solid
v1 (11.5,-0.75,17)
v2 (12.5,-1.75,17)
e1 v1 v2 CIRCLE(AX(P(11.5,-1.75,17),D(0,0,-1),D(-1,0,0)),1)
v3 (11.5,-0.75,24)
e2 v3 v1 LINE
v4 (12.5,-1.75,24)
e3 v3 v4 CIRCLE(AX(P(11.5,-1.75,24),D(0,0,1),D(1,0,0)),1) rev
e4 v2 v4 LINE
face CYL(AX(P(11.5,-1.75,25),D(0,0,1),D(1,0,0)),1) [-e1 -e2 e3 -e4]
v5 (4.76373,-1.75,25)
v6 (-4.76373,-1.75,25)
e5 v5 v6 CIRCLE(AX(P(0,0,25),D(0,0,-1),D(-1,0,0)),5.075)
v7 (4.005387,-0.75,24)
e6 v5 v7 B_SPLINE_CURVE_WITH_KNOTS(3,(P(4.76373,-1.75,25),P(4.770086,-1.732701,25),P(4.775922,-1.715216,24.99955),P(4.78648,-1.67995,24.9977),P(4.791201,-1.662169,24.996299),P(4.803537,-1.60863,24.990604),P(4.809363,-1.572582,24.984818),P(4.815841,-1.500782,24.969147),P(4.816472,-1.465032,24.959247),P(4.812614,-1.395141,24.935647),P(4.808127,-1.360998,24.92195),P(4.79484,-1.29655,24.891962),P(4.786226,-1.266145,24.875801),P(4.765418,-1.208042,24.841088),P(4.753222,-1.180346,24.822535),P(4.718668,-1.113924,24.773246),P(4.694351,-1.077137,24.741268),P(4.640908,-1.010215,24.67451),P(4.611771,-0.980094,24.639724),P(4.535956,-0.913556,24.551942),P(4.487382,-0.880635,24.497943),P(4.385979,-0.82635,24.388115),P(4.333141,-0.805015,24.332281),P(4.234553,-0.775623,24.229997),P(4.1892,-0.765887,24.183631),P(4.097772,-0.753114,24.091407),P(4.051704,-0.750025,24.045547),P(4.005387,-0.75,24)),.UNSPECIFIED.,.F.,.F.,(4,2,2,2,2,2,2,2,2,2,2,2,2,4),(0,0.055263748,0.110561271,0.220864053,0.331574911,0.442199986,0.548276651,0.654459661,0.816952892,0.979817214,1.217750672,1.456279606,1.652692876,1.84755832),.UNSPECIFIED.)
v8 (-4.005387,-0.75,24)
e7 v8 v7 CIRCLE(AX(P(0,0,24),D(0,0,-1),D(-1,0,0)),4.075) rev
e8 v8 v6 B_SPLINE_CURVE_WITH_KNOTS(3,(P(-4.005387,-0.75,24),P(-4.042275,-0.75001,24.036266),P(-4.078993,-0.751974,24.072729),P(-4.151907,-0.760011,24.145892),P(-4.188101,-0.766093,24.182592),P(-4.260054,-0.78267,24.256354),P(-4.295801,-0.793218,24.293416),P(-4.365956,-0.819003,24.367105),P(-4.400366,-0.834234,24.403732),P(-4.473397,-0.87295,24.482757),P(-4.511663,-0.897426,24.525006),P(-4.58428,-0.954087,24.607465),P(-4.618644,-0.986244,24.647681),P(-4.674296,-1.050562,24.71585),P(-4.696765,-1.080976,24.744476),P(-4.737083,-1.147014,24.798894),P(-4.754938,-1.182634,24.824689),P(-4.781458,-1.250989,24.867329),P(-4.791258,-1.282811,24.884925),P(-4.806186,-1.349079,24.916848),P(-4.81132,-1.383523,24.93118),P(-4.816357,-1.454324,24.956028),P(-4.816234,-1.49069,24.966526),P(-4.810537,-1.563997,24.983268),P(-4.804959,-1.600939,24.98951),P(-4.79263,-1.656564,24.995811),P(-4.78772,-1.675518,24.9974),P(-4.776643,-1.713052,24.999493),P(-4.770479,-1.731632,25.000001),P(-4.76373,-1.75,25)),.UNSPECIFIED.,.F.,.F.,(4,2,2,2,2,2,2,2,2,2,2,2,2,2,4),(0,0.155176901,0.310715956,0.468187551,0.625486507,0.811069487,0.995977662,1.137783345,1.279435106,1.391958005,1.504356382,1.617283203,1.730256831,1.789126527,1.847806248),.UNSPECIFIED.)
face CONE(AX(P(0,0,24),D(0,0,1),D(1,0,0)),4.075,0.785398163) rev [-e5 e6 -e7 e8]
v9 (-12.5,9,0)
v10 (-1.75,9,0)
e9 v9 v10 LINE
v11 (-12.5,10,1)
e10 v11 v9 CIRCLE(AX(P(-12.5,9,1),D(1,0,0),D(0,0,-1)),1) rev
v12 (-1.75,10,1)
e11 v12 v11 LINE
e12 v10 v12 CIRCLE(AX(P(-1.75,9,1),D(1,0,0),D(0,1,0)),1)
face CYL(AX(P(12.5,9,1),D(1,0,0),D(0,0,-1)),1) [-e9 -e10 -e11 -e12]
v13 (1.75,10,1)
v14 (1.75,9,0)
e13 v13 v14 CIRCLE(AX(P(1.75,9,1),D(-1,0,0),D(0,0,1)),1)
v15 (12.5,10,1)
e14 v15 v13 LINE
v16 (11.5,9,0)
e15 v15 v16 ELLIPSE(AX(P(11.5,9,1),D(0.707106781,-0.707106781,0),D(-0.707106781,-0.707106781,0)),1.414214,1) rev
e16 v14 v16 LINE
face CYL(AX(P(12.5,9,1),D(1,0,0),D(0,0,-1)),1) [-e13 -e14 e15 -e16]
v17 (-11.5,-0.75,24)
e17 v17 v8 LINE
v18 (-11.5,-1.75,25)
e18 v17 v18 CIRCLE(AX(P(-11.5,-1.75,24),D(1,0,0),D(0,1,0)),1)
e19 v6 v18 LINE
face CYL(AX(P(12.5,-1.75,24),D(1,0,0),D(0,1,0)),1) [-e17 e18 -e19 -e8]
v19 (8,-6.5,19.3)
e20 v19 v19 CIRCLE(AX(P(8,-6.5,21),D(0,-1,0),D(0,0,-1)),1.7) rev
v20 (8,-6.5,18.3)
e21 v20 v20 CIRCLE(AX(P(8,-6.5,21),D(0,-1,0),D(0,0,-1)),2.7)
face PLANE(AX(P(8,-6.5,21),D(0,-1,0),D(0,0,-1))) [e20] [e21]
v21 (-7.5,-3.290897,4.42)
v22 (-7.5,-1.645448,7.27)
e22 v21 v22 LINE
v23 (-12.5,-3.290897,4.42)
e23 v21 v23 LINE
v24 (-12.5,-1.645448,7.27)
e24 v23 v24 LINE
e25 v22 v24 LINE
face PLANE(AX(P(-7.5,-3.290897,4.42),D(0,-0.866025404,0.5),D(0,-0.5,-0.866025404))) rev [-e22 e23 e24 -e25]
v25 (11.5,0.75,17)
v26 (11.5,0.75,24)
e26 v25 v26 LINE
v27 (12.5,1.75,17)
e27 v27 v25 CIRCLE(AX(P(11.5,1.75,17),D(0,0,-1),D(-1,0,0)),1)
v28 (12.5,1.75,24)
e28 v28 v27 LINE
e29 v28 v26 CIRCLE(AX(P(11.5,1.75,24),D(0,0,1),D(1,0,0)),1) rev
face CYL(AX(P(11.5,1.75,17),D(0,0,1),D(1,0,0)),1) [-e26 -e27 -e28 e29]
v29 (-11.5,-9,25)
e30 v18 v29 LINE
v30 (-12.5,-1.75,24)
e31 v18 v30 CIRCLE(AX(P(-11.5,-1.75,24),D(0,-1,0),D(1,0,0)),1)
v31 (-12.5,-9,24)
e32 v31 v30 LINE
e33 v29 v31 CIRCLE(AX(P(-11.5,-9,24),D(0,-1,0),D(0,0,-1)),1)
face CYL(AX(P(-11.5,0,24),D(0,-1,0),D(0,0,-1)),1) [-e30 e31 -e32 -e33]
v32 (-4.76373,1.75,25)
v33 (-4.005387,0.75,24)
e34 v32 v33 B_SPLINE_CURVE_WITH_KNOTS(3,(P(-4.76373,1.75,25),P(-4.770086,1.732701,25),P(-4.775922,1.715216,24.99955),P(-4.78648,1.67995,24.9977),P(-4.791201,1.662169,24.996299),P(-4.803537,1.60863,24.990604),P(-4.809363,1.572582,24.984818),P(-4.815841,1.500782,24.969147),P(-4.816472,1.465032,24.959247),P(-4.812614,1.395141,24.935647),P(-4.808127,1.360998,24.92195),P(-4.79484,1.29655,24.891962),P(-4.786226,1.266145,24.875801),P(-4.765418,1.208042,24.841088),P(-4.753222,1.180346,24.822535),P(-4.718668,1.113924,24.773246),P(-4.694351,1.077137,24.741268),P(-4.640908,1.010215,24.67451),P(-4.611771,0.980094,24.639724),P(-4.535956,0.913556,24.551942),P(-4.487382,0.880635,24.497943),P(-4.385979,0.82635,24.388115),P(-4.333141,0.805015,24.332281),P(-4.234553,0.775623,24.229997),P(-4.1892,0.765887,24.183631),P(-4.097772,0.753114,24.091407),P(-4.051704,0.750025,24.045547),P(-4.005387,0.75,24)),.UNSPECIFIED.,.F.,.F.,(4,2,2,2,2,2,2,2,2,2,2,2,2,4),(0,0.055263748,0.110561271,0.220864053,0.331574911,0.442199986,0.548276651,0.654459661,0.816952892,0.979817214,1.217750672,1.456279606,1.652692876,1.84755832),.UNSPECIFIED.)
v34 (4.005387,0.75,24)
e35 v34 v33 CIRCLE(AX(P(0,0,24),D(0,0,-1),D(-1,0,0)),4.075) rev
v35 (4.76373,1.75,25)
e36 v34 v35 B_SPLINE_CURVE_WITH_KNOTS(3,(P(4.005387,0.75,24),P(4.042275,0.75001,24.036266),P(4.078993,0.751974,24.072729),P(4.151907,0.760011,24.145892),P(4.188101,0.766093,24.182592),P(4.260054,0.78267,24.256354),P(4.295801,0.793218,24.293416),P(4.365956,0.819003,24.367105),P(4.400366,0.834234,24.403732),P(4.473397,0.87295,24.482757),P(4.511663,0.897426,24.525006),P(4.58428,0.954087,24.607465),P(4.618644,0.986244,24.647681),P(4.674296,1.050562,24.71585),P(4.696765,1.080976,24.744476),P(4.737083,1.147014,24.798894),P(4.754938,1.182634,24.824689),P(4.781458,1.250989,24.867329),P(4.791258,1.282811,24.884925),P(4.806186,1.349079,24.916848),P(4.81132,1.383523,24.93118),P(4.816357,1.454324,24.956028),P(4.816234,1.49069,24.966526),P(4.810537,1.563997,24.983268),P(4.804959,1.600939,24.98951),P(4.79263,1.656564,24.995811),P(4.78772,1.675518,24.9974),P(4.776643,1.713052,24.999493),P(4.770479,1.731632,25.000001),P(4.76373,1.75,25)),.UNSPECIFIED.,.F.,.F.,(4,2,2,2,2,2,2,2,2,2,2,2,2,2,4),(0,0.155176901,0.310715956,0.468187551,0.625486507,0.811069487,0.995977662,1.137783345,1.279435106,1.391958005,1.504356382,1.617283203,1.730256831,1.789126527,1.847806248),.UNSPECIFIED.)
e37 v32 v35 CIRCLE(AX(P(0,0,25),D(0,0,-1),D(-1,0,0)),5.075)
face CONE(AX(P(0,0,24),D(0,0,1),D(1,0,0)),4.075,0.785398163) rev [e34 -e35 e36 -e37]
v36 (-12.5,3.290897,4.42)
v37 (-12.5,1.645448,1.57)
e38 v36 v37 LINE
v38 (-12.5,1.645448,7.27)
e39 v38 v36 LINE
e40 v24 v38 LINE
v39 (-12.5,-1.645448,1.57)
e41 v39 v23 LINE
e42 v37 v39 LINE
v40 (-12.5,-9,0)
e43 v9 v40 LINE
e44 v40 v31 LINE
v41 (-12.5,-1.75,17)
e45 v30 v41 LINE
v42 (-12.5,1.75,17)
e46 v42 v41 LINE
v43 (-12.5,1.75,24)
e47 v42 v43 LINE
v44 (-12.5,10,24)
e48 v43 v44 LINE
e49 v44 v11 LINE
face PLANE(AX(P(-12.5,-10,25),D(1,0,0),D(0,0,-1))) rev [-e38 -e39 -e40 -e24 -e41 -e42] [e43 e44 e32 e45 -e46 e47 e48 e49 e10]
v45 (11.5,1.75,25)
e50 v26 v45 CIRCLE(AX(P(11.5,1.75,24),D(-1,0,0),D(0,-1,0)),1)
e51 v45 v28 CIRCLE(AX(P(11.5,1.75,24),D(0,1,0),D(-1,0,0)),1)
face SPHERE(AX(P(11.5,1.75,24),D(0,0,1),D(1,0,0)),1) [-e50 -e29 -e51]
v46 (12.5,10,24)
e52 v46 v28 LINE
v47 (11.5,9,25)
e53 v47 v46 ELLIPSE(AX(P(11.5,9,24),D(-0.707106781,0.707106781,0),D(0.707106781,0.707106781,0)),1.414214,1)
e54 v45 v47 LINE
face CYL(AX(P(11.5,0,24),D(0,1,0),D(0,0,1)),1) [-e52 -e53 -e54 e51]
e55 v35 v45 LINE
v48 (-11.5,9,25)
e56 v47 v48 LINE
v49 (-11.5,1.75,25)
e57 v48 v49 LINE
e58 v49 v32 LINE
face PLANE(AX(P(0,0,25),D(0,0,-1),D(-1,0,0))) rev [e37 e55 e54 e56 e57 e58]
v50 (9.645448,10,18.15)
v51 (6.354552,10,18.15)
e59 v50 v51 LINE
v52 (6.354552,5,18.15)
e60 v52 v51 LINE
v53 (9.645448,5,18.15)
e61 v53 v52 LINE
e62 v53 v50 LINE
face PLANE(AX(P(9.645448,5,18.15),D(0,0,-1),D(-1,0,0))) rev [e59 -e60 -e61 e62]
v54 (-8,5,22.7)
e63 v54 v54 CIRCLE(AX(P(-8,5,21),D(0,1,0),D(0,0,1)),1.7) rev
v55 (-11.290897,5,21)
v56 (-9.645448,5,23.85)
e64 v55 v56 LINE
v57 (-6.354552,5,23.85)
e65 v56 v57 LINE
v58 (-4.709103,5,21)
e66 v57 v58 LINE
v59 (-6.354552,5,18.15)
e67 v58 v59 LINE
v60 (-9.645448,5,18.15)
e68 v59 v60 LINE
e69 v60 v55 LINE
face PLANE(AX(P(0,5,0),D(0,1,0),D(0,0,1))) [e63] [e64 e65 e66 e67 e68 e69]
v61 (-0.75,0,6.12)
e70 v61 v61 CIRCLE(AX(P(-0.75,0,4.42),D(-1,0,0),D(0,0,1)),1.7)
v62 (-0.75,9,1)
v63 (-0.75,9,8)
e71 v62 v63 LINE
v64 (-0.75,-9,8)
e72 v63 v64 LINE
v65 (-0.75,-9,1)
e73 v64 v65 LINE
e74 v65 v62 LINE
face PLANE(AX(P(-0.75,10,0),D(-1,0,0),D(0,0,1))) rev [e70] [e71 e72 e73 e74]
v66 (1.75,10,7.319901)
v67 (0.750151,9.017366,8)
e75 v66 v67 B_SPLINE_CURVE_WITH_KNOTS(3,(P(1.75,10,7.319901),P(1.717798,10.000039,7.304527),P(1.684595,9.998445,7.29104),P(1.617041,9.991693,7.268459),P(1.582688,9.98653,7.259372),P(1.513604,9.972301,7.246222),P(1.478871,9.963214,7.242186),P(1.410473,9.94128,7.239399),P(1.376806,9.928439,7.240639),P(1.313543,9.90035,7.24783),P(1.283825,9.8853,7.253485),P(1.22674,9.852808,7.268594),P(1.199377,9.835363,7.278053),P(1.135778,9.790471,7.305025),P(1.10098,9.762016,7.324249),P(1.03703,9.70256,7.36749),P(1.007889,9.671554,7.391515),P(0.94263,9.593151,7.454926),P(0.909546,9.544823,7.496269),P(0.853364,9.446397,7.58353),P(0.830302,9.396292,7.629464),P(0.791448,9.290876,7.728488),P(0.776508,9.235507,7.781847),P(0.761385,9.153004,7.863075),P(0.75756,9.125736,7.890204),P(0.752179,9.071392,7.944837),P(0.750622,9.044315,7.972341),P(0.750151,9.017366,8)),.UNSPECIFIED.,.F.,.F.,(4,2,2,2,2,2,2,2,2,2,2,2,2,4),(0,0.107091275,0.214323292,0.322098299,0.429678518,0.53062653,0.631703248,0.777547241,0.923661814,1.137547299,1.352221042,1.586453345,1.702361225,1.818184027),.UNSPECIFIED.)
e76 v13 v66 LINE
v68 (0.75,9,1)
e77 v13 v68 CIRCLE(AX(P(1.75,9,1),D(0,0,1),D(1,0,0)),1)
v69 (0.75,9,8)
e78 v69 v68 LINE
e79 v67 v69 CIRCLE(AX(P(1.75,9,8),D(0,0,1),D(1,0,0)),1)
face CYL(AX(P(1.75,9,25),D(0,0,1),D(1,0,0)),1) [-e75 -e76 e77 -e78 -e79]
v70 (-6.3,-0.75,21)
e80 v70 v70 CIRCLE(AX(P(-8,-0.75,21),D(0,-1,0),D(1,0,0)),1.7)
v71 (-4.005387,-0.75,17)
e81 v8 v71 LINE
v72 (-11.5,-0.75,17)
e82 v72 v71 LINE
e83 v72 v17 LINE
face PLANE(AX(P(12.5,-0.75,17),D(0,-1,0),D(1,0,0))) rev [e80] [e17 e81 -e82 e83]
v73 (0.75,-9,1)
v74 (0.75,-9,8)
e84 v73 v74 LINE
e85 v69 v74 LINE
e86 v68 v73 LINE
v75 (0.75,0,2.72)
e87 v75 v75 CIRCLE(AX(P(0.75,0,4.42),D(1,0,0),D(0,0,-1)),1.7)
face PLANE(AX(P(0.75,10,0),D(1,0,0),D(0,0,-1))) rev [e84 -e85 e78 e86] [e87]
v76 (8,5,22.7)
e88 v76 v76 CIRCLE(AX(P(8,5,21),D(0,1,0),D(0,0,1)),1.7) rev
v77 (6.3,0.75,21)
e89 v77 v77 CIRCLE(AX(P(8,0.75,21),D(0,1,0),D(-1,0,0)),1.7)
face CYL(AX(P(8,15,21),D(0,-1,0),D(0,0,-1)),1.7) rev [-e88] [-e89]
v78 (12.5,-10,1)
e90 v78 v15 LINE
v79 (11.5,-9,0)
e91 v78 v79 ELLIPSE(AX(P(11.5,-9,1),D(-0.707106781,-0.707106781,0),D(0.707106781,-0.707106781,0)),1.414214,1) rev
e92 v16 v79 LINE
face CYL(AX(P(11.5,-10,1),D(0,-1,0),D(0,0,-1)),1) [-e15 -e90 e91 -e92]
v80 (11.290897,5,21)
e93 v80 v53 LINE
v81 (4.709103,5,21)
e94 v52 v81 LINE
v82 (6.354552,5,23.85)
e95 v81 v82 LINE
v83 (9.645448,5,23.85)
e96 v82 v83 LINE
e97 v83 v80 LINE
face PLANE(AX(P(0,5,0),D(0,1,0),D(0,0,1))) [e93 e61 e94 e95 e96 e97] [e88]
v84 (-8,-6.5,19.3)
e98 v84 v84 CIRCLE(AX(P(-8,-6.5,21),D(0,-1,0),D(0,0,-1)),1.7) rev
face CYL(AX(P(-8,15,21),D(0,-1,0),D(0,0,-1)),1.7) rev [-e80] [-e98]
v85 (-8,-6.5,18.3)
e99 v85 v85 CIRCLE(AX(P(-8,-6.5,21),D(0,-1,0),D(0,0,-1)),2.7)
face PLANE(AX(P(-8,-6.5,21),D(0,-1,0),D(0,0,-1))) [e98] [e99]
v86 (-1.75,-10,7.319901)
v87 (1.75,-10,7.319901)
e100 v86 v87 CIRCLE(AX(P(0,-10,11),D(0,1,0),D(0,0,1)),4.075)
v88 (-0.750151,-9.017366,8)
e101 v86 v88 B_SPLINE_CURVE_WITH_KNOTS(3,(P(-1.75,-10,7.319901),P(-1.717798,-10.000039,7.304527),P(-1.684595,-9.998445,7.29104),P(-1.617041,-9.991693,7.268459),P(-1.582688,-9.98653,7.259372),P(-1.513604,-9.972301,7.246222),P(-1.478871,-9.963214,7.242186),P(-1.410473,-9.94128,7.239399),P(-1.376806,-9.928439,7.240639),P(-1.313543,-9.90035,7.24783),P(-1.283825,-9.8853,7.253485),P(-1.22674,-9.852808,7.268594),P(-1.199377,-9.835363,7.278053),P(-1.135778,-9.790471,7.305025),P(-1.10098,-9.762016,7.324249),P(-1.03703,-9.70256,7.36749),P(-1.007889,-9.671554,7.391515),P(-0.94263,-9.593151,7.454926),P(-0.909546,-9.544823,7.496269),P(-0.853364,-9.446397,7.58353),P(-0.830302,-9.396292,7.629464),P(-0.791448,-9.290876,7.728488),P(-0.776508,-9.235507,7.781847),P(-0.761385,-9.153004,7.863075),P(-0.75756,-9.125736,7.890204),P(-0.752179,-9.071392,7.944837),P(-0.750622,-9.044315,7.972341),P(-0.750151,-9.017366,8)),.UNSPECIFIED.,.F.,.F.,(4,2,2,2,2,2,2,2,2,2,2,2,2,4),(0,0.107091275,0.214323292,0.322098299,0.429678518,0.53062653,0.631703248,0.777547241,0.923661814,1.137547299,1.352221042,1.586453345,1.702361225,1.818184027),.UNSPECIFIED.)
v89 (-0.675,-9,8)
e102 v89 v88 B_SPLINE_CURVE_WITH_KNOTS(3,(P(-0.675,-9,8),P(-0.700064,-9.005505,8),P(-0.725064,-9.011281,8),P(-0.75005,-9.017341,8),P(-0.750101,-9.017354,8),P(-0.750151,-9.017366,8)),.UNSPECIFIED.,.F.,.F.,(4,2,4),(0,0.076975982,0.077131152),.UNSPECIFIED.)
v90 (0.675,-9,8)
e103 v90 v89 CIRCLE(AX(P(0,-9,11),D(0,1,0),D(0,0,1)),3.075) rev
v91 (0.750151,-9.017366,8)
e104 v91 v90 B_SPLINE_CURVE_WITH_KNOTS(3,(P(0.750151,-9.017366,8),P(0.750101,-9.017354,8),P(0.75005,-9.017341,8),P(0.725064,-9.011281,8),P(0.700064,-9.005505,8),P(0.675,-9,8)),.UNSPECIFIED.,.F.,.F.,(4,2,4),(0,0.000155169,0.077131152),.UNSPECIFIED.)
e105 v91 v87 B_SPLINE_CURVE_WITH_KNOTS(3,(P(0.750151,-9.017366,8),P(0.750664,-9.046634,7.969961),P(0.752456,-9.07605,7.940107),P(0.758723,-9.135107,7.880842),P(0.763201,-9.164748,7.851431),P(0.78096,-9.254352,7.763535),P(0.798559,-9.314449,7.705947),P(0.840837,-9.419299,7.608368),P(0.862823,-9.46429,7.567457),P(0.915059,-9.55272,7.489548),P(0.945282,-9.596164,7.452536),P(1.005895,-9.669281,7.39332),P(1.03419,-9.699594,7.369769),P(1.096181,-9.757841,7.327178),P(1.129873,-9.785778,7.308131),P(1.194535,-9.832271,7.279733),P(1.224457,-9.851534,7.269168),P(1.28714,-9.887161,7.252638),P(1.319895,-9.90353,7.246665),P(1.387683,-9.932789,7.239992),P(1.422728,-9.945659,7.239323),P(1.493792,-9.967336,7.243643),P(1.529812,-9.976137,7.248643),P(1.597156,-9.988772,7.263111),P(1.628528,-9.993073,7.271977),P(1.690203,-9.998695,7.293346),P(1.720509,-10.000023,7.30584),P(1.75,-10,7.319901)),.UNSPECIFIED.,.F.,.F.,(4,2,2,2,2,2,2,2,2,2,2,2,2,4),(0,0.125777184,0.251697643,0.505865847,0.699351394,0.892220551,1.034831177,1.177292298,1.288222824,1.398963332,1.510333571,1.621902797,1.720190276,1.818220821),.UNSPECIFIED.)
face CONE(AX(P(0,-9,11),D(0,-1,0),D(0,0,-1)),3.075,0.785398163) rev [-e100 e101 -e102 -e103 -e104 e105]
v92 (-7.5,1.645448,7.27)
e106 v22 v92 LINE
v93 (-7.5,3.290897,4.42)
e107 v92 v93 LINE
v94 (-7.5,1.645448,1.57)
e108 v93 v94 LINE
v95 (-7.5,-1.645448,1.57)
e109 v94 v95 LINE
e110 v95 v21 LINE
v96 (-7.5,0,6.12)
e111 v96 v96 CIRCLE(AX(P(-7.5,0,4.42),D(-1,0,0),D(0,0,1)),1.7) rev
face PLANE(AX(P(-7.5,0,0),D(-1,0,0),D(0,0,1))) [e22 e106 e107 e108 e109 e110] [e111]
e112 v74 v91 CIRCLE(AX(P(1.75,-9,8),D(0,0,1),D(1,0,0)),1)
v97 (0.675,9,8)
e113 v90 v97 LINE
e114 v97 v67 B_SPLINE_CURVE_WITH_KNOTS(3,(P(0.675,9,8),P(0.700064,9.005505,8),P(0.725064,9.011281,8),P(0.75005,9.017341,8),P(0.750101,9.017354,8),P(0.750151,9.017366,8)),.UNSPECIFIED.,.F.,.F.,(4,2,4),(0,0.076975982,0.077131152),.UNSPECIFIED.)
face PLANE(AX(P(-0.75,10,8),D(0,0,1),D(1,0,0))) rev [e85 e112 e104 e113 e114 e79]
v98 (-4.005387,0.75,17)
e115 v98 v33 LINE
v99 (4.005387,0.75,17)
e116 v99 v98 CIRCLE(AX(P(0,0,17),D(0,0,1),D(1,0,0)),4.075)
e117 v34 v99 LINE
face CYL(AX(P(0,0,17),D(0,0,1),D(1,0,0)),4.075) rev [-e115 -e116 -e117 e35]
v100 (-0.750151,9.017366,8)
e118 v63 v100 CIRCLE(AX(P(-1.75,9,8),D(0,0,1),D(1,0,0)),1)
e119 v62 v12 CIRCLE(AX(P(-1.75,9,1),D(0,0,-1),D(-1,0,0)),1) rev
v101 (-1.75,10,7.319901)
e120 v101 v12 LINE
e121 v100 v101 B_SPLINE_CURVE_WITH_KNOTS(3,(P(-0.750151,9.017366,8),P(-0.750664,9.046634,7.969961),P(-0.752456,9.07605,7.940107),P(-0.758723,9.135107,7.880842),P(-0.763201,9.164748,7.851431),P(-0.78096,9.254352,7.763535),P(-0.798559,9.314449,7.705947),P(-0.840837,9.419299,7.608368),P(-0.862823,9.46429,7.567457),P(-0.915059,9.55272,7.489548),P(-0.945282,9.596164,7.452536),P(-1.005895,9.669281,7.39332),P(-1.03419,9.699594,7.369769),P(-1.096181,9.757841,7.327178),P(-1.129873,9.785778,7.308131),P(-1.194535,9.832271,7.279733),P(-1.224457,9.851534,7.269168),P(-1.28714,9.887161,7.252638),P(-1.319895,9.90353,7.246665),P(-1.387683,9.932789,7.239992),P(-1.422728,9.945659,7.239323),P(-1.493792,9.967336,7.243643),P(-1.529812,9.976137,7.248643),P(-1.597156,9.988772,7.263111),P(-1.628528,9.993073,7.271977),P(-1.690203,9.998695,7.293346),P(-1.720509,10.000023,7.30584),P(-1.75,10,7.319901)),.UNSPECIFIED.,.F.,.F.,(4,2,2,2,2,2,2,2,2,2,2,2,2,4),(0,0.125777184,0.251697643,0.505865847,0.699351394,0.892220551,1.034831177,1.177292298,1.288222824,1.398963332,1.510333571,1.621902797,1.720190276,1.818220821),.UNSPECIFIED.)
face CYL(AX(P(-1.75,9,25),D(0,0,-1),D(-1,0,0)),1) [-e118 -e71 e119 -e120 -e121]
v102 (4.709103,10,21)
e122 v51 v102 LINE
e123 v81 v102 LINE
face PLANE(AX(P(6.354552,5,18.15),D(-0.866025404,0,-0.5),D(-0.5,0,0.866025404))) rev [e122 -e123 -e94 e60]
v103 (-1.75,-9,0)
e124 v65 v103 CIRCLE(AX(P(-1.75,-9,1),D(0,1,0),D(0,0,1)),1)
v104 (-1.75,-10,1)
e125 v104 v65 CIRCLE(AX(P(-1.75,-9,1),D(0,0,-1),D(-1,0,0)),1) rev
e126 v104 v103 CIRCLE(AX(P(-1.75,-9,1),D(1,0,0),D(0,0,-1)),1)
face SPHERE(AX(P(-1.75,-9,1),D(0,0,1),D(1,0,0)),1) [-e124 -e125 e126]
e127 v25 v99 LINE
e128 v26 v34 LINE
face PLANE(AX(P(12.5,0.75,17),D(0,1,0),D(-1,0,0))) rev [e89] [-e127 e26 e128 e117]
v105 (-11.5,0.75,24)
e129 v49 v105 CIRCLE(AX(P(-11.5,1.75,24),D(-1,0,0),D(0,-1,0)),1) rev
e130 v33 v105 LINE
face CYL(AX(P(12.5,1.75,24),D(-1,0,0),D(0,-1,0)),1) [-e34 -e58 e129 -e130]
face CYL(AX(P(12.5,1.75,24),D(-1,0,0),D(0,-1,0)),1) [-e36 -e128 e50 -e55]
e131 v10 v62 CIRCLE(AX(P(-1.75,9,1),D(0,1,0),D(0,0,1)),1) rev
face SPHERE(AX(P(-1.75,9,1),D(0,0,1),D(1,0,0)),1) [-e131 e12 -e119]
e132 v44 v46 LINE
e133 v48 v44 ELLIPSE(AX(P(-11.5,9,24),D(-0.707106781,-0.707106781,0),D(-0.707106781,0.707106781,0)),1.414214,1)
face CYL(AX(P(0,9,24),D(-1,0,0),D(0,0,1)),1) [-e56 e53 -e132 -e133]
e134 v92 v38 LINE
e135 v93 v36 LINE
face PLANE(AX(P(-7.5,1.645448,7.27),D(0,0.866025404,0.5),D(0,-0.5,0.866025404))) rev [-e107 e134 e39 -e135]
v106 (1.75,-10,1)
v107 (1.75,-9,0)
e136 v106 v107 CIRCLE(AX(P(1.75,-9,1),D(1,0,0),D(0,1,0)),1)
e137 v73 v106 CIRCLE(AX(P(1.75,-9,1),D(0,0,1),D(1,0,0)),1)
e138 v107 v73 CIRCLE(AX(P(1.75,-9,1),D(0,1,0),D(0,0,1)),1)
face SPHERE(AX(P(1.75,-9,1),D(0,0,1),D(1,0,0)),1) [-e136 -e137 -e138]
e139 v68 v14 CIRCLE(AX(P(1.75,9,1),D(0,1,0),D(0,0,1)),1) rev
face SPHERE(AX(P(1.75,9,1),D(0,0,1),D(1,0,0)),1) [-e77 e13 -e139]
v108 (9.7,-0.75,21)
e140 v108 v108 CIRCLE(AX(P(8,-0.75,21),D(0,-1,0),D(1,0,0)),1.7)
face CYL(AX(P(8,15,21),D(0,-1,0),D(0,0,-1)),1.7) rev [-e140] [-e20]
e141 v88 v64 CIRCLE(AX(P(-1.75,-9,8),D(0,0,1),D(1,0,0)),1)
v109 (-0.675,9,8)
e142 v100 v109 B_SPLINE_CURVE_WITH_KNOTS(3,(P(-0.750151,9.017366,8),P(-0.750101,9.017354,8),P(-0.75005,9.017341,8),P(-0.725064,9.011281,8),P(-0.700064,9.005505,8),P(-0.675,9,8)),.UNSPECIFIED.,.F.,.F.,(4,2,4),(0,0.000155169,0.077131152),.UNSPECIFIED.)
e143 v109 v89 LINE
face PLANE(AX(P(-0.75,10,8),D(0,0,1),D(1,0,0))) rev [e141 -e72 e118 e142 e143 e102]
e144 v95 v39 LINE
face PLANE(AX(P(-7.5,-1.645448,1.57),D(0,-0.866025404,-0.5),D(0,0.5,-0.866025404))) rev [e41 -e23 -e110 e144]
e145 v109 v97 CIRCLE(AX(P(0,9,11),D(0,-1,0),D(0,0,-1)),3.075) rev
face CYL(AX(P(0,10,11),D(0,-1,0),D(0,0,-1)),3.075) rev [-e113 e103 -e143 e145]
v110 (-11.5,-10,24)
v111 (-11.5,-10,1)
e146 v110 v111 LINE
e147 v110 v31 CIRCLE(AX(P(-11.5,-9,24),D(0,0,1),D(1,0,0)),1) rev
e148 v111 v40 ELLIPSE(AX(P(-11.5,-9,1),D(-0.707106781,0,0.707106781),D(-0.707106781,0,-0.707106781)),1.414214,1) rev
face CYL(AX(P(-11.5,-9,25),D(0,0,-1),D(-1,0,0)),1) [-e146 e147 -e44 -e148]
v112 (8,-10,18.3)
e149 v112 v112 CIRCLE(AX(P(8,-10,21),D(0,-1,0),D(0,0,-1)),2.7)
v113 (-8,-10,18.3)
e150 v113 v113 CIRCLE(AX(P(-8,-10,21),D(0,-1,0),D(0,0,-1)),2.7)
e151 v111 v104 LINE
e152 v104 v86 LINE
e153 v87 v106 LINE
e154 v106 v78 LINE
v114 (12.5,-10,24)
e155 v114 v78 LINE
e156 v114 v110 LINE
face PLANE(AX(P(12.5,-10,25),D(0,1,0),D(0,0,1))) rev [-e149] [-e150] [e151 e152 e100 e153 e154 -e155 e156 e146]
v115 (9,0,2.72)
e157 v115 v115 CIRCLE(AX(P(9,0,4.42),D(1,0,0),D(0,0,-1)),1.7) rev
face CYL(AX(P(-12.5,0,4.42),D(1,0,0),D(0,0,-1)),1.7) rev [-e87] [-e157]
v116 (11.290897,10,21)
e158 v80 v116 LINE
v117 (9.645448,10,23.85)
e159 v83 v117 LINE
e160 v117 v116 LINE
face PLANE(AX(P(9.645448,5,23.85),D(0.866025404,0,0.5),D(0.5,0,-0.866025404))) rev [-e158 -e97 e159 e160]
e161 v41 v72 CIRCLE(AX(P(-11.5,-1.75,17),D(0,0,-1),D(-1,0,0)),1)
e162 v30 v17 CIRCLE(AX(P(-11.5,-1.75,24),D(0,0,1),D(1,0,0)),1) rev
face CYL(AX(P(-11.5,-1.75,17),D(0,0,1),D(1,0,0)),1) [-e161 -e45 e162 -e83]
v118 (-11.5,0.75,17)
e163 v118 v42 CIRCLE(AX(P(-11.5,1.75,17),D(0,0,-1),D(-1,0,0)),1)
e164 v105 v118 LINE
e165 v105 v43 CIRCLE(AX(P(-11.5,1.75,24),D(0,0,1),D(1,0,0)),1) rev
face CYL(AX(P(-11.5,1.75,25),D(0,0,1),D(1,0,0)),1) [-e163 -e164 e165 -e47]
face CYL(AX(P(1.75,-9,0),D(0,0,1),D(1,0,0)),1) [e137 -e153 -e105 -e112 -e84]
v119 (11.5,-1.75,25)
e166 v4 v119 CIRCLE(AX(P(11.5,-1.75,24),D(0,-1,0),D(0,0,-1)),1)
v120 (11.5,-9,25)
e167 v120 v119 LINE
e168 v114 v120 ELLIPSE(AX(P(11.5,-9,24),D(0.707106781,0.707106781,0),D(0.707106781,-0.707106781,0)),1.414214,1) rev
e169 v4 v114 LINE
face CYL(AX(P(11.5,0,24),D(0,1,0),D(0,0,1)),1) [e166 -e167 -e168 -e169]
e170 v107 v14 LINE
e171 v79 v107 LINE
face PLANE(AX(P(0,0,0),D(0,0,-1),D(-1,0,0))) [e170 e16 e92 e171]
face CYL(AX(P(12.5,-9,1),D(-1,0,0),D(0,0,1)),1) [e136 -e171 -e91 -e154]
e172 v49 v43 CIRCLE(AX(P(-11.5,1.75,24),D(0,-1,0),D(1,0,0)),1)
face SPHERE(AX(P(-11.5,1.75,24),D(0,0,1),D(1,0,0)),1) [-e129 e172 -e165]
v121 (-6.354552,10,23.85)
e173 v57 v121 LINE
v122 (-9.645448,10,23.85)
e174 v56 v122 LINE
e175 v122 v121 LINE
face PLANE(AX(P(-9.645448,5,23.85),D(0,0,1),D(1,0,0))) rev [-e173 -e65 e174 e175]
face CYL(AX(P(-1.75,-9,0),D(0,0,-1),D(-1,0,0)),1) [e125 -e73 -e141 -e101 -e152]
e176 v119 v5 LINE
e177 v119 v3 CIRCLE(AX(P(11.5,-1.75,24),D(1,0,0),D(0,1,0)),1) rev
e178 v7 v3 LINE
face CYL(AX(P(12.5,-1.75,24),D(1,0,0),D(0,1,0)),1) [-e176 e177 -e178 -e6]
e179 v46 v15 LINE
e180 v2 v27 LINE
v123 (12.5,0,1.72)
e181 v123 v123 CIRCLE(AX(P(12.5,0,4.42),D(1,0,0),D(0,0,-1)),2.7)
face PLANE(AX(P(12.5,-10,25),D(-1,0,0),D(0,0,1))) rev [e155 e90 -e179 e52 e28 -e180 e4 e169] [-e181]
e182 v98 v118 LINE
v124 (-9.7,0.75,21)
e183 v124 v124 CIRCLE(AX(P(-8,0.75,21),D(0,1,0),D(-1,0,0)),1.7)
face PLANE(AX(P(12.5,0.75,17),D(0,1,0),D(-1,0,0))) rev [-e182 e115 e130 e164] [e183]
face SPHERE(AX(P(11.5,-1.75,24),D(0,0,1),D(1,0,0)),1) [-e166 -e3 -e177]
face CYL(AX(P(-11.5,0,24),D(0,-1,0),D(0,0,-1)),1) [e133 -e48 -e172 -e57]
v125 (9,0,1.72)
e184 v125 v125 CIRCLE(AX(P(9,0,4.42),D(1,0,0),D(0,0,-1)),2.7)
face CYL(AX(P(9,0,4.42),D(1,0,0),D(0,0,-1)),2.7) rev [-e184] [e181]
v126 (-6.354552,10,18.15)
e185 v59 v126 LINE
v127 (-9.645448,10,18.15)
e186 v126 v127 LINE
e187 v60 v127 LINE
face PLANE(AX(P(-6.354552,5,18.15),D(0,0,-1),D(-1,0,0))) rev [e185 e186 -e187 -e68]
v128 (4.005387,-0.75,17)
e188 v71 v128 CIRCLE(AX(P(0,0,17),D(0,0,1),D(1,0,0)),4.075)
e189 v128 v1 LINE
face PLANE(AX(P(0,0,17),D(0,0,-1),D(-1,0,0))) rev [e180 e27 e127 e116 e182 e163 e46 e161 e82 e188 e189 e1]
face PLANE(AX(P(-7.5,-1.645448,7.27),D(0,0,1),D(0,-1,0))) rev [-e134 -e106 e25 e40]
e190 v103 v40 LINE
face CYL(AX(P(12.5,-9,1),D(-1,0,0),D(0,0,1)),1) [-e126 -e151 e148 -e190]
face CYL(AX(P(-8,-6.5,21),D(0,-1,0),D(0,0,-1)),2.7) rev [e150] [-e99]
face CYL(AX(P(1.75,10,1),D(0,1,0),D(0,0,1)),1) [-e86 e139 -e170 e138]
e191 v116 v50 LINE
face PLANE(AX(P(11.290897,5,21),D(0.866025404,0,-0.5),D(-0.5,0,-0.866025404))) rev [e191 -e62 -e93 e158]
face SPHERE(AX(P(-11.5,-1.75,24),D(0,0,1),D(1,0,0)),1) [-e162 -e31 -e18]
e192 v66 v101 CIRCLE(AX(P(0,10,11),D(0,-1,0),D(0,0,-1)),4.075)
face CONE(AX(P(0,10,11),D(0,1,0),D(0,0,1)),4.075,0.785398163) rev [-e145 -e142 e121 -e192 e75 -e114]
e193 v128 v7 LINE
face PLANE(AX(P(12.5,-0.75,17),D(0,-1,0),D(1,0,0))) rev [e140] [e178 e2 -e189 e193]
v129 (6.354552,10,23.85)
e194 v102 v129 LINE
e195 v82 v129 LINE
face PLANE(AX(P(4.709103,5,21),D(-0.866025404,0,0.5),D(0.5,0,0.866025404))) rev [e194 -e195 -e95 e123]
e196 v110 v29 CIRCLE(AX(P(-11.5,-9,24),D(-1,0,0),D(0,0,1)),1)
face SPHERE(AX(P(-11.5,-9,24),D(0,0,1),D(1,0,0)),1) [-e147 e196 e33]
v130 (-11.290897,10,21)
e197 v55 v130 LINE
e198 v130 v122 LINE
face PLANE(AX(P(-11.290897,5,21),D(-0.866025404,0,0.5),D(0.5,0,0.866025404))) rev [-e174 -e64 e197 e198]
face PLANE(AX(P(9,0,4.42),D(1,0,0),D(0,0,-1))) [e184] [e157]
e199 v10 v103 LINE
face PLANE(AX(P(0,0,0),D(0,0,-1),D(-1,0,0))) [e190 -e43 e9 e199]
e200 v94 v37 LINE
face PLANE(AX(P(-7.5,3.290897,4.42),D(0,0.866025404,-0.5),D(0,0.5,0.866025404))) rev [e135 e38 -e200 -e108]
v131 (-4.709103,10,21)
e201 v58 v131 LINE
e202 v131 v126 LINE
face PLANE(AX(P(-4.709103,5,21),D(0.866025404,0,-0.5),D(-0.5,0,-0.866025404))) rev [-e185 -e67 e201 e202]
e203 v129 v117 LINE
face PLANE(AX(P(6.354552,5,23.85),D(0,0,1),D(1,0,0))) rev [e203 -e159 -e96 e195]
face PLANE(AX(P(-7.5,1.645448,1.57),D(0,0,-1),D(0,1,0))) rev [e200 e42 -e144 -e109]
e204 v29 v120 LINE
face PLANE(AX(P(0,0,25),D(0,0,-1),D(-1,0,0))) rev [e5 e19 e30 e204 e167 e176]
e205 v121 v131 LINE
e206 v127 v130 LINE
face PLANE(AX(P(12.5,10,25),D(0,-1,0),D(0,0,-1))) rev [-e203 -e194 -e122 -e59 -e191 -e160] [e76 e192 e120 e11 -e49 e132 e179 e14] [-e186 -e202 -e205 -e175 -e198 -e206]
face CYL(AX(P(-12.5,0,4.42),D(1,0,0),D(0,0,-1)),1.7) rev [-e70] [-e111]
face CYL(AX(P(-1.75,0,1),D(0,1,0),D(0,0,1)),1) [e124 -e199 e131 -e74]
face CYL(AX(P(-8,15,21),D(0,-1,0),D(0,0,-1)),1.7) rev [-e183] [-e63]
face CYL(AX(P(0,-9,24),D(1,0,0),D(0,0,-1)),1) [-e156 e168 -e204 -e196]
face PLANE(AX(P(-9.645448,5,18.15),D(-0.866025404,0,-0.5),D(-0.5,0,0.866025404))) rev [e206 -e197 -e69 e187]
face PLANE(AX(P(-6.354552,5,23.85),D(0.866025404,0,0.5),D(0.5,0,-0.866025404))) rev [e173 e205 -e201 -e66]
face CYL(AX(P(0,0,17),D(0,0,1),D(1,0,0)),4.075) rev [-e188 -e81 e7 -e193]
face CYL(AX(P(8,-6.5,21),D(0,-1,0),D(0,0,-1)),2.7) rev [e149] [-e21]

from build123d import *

# Parameters (mm, degrees)
SKIZZE1_W                        = 20
SKIZZE1_H                        = 25
AUFSATZ_LINEAR_AUSTRAGEN1_DEPTH  = 25
SKIZZE2_W                        = 1.5
SKIZZE2_H                        = 8
SCHNITT_PENDEL_DEPTH             = 20
SKIZZE3_R                        = 3.075
LOCH_PENDEL_DEPTH                = 20
SKIZZE6_W                        = 25
SKIZZE6_H                        = 1.5
SCHNITT_WELLE_DEPTH              = 8
SKIZZE7_R                        = 4.075
LOCH_WELLE_DEPTH                 = 8
SKIZZE9_R                        = 1.7
SCHNITT_LINEAR_AUSTRAGEN9_DEPTH  = 25
SKIZZE10_R                       = 2.7
SCHNITT_LINEAR_AUSTRAGEN10_DEPTH = 3.5
SCHNITT_LINEAR_AUSTRAGEN11_DEPTH = 5
SKIZZE13_R                       = 1.7
SCHNITT_LINEAR_AUSTRAGEN12_DEPTH = 25
SKIZZE15_R                       = 2.7
SCHNITT_LINEAR_AUSTRAGEN13_DEPTH = 3.5
SCHNITT_LINEAR_AUSTRAGEN14_DEPTH = 5
FASE1_SIZE                       = 1
VERRUNDUNG5_R                    = 1
VERRUNDUNG6_R                    = 1


with BuildPart() as part:
    # Skizze1 → Aufsatz-Linear austragen1 (new body)
    with BuildSketch(Plane(origin=(0, 0, 0), x_dir=(0, 1, 0), z_dir=(0, 0, 1))):
        Rectangle(SKIZZE1_W, SKIZZE1_H)
    extrude(amount=AUFSATZ_LINEAR_AUSTRAGEN1_DEPTH)

    # Skizze2 → Schnitt Pendel (cut)
    with BuildSketch(Plane.XZ.offset(10)):
        with Locations((0, 4)):
            Rectangle(SKIZZE2_W, SKIZZE2_H)
    extrude(amount=-SCHNITT_PENDEL_DEPTH, mode=Mode.SUBTRACT)

    # Skizze3 → Loch Pendel (cut)
    with BuildSketch(Plane.XZ.offset(10)):
        with Locations((0, 11)):
            Circle(SKIZZE3_R)
    extrude(amount=-LOCH_PENDEL_DEPTH, mode=Mode.SUBTRACT)

    # Skizze6 → Schnitt Welle (cut)
    with BuildSketch(Plane.XY.offset(25)):
        Rectangle(SKIZZE6_W, SKIZZE6_H)
    extrude(amount=-SCHNITT_WELLE_DEPTH, mode=Mode.SUBTRACT)

    # Skizze7 → Loch Welle (cut)
    with BuildSketch(Plane.XY.offset(25)):
        Circle(SKIZZE7_R)
    extrude(amount=-LOCH_WELLE_DEPTH, mode=Mode.SUBTRACT)

    # Skizze9 → Schnitt-Linear austragen9 (cut)
    with BuildSketch(Plane.YZ.offset(12.5)):
        with Locations(Location((0, 4.42, 0), (0, 0, 270))):
            Circle(SKIZZE9_R)
    extrude(amount=-SCHNITT_LINEAR_AUSTRAGEN9_DEPTH, mode=Mode.SUBTRACT)

    # Skizze10 → Schnitt-Linear austragen10 (cut)
    with BuildSketch(Plane.YZ.offset(12.5)):
        with Locations(Location((0, 4.42, 0), (0, 0, 270))):
            Circle(SKIZZE10_R)
    extrude(amount=-SCHNITT_LINEAR_AUSTRAGEN10_DEPTH, mode=Mode.SUBTRACT)

    # Skizze11 → Schnitt-Linear austragen11 (cut)
    with BuildSketch(Plane(origin=(-12.5, 0, 0), x_dir=(0, -1, 0), z_dir=(-1, 0, 0))):
        Polygon((3.290896534, 4.42), (1.645448267, 7.27), (-1.645448267, 7.27), (-3.290896534, 4.42), (-1.645448267, 1.57), (1.645448267, 1.57), align=None)
    extrude(amount=-SCHNITT_LINEAR_AUSTRAGEN11_DEPTH, mode=Mode.SUBTRACT)

    # Skizze13 → Schnitt-Linear austragen12 (cut)
    with BuildSketch(Plane.XZ.offset(10)):
        with Locations(Location((-8, 21, 0), (0, 0, 270))):
            Circle(SKIZZE13_R)
        with Locations(Location((8, 21, 0), (0, 0, 270))):
            Circle(SKIZZE13_R)
    extrude(amount=-SCHNITT_LINEAR_AUSTRAGEN12_DEPTH, mode=Mode.SUBTRACT)

    # Skizze15 → Schnitt-Linear austragen13 (cut)
    with BuildSketch(Plane.XZ.offset(10)):
        with Locations(Location((-8, 21, 0), (0, 0, 270))):
            Circle(SKIZZE15_R)
        with Locations(Location((8, 21, 0), (0, 0, 270))):
            Circle(SKIZZE15_R)
    extrude(amount=-SCHNITT_LINEAR_AUSTRAGEN13_DEPTH, mode=Mode.SUBTRACT)

    # Skizze16 → Schnitt-Linear austragen14 (cut)
    with BuildSketch(Plane(origin=(0, 10, 0), x_dir=(-1, 0, 0), z_dir=(0, 1, 0))):
        Polygon((11.290896534, 21), (9.645448267, 23.85), (6.354551733, 23.85), (4.709103466, 21), (6.354551733, 18.15), (9.645448267, 18.15), align=None)
        Polygon((-4.709103466, 21), (-6.354551733, 23.85), (-9.645448267, 23.85), (-11.290896534, 21), (-9.645448267, 18.15), (-6.354551733, 18.15), align=None)
    extrude(amount=-SCHNITT_LINEAR_AUSTRAGEN14_DEPTH, mode=Mode.SUBTRACT)

    # Fase1
    fase1_edges = [part.edges().sort_by_distance(p)[0] for p in [
        (0, -10, 14.075),
        (0, 4.075, 25),
        (0, -4.075, 25),
        (0, 10, 14.075),
    ]]
    chamfer(fase1_edges, length=FASE1_SIZE)

    # Verrundung5
    # the kernel refuses this fillet: 1 mm, written as the material it takes off along each edge
    with BuildSketch(Plane(origin=(12.5, 0.75, 27.5), x_dir=(0, 1, 0), z_dir=(0, 0, -1)), Plane(origin=(-12.5, -0.75, 27.5), x_dir=(0, -1, 0), z_dir=(0, 0, -1))) as verrundung5_piece_1:
        with BuildLine():
            CenterArc((VERRUNDUNG5_R, -VERRUNDUNG5_R), VERRUNDUNG5_R, 90, 90)
            Line((0, -VERRUNDUNG5_R), (0, 0))
            Line((0, 0), (VERRUNDUNG5_R, 0))
        make_face()
    extrude(amount=10.5, mode=Mode.SUBTRACT)
    with BuildSketch(Plane(origin=(12.5, -0.75, 27.5), x_dir=(0, -1, 0), z_dir=(0, 0, -1)), Plane(origin=(-12.5, 0.75, 27.5), x_dir=(0, 1, 0), z_dir=(0, 0, -1))) as verrundung5_piece_2:
        with BuildLine():
            CenterArc((VERRUNDUNG5_R, VERRUNDUNG5_R), VERRUNDUNG5_R, 180, 90)
            Line((0, VERRUNDUNG5_R), (0, 0))
            Line((0, 0), (VERRUNDUNG5_R, 0))
        make_face()
    extrude(amount=10.5, mode=Mode.SUBTRACT)
    with BuildSketch(Plane(origin=(-0.75, 10, 9.494613002), x_dir=(0, -1, 0), z_dir=(0, 0, -1))) as verrundung5_piece_3_section:
        with BuildLine():
            CenterArc((VERRUNDUNG5_R, VERRUNDUNG5_R), VERRUNDUNG5_R, 180, 90)
            Line((0, VERRUNDUNG5_R), (0, 0))
            Line((0, 0), (VERRUNDUNG5_R, 0))
        make_face()
    verrundung5_piece_3 = extrude(amount=11.994613002, mode=Mode.PRIVATE)
    verrundung5_piece_3 = split(verrundung5_piece_3, bisect_by=Plane(origin=(-0.971795619, 9.77244026, 8), z_dir=(0, 0, -1)), keep=Keep.TOP, mode=Mode.PRIVATE)
    add(verrundung5_piece_3, mode=Mode.SUBTRACT)
    with BuildSketch(Plane(origin=(0.75, 10, -2.5), x_dir=(0, -1, 0), z_dir=(0, 0, 1))) as verrundung5_piece_4_section:
        with BuildLine():
            CenterArc((VERRUNDUNG5_R, VERRUNDUNG5_R), VERRUNDUNG5_R, 180, 90)
            Line((0, VERRUNDUNG5_R), (0, 0))
            Line((0, 0), (VERRUNDUNG5_R, 0))
        make_face()
    verrundung5_piece_4 = extrude(amount=11.994613002, mode=Mode.PRIVATE)
    verrundung5_piece_4 = split(verrundung5_piece_4, bisect_by=Plane(origin=(0.971795687, 9.772440059, 8), z_dir=(0, 0, -1)), keep=Keep.TOP, mode=Mode.PRIVATE)
    add(verrundung5_piece_4, mode=Mode.SUBTRACT)
    with BuildSketch(Plane(origin=(-0.75, -10, 9.494613002), x_dir=(-1, 0, 0), z_dir=(0, 0, -1))) as verrundung5_piece_5_section:
        with BuildLine():
            CenterArc((VERRUNDUNG5_R, VERRUNDUNG5_R), VERRUNDUNG5_R, 180, 90)
            Line((0, VERRUNDUNG5_R), (0, 0))
            Line((0, 0), (VERRUNDUNG5_R, 0))
        make_face()
    verrundung5_piece_5 = extrude(amount=11.994613002, mode=Mode.PRIVATE)
    verrundung5_piece_5 = split(verrundung5_piece_5, bisect_by=Plane(origin=(-0.971795692, -9.772440079, 8), z_dir=(0, 0, -1)), keep=Keep.TOP, mode=Mode.PRIVATE)
    add(verrundung5_piece_5, mode=Mode.SUBTRACT)
    with BuildSketch(Plane(origin=(0.75, -10, -2.5), x_dir=(1, 0, 0), z_dir=(0, 0, 1))) as verrundung5_piece_6_section:
        with BuildLine():
            CenterArc((VERRUNDUNG5_R, VERRUNDUNG5_R), VERRUNDUNG5_R, 180, 90)
            Line((0, VERRUNDUNG5_R), (0, 0))
            Line((0, 0), (VERRUNDUNG5_R, 0))
        make_face()
    verrundung5_piece_6 = extrude(amount=11.994613002, mode=Mode.PRIVATE)
    verrundung5_piece_6 = split(verrundung5_piece_6, bisect_by=Plane(origin=(0.971795678, -9.772440107, 8), z_dir=(0, 0, -1)), keep=Keep.TOP, mode=Mode.PRIVATE)
    add(verrundung5_piece_6, mode=Mode.SUBTRACT)
    with BuildSketch(Plane(origin=(-0.75, -12.5, 0), x_dir=(0, 0, 1), z_dir=(0, 1, 0))) as verrundung5_piece_7:
        with BuildLine():
            CenterArc((VERRUNDUNG5_R, -VERRUNDUNG5_R), VERRUNDUNG5_R, 90, 90)
            Line((0, -VERRUNDUNG5_R), (0, 0))
            Line((0, 0), (VERRUNDUNG5_R, 0))
        make_face()
    extrude(amount=25, mode=Mode.SUBTRACT)
    with BuildSketch(Plane(origin=(0.75, -12.5, 0), x_dir=(0, 0, 1), z_dir=(0, 1, 0))) as verrundung5_piece_8:
        with BuildLine():
            CenterArc((VERRUNDUNG5_R, VERRUNDUNG5_R), VERRUNDUNG5_R, 180, 90)
            Line((0, VERRUNDUNG5_R), (0, 0))
            Line((0, 0), (VERRUNDUNG5_R, 0))
        make_face()
    extrude(amount=25, mode=Mode.SUBTRACT)
    with BuildSketch(Plane(origin=(-2.519275346, 0.75, 25), x_dir=(0, 1, 0), z_dir=(-1, 0, 0)), Plane(origin=(-15, -0.75, 25), x_dir=(0, -1, 0), z_dir=(1, 0, 0)), Plane(origin=(15, 0.75, 25), x_dir=(0, 1, 0), z_dir=(-1, 0, 0)), Plane(origin=(2.519275346, -0.75, 25), x_dir=(0, -1, 0), z_dir=(1, 0, 0))) as verrundung5_piece_9:
        with BuildLine():
            CenterArc((VERRUNDUNG5_R, VERRUNDUNG5_R), VERRUNDUNG5_R, 180, 90)
            Line((0, VERRUNDUNG5_R), (0, 0))
            Line((0, 0), (VERRUNDUNG5_R, 0))
        make_face()
    extrude(amount=12.480724654, mode=Mode.SUBTRACT)

    # Verrundung6
    # the kernel refuses this fillet: 1 mm, written as the material it takes off along each edge
    with BuildSketch(Plane(origin=(11.5, 1.75, 24), x_dir=(0, 0, 1), z_dir=(1, 0, 0))) as verrundung6_piece_1_section:
        Polygon((0, 0), (VERRUNDUNG6_R, 0), (VERRUNDUNG6_R, VERRUNDUNG6_R), (0, VERRUNDUNG6_R), align=None)
    verrundung6_piece_1 = extrude(amount=VERRUNDUNG6_R, mode=Mode.PRIVATE)
    verrundung6_piece_1 = verrundung6_piece_1 - Plane(origin=(11.5, 1.75, 24), x_dir=(0, 0.7071067811865475, -0.7071067811865475), z_dir=(1, 0, 0)) * Sphere(VERRUNDUNG6_R, mode=Mode.PRIVATE)
    add(verrundung6_piece_1, mode=Mode.SUBTRACT)
    with BuildSketch(Plane(origin=(11.5, -1.75, 24), x_dir=(0, 0, 1), z_dir=(1, 0, 0))) as verrundung6_piece_2_section:
        Polygon((0, 0), (VERRUNDUNG6_R, 0), (VERRUNDUNG6_R, -VERRUNDUNG6_R), (0, -VERRUNDUNG6_R), align=None)
    verrundung6_piece_2 = extrude(amount=VERRUNDUNG6_R, mode=Mode.PRIVATE)
    verrundung6_piece_2 = verrundung6_piece_2 - Plane(origin=(11.5, -1.75, 24), x_dir=(0, -0.7071067811865475, -0.7071067811865475), z_dir=(1, 0, 0)) * Sphere(VERRUNDUNG6_R, mode=Mode.PRIVATE)
    add(verrundung6_piece_2, mode=Mode.SUBTRACT)
    with BuildSketch(Plane(origin=(-11.5, 1.75, 24), x_dir=(0, 0, 1), z_dir=(-1, 0, 0))) as verrundung6_piece_3_section:
        Polygon((0, 0), (VERRUNDUNG6_R, 0), (VERRUNDUNG6_R, -VERRUNDUNG6_R), (0, -VERRUNDUNG6_R), align=None)
    verrundung6_piece_3 = extrude(amount=VERRUNDUNG6_R, mode=Mode.PRIVATE)
    verrundung6_piece_3 = verrundung6_piece_3 - Plane(origin=(-11.5, 1.75, 24), x_dir=(0, 0.7071067811865475, -0.7071067811865475), z_dir=(-1, 0, 0)) * Sphere(VERRUNDUNG6_R, mode=Mode.PRIVATE)
    add(verrundung6_piece_3, mode=Mode.SUBTRACT)
    with BuildSketch(Plane(origin=(-11.5, -1.75, 24), x_dir=(-1, 0, 0), z_dir=(0, 0, 1))) as verrundung6_piece_4_section:
        Polygon((0, 0), (VERRUNDUNG6_R, 0), (VERRUNDUNG6_R, -VERRUNDUNG6_R), (0, -VERRUNDUNG6_R), align=None)
    verrundung6_piece_4 = extrude(amount=VERRUNDUNG6_R, mode=Mode.PRIVATE)
    verrundung6_piece_4 = verrundung6_piece_4 - Plane(origin=(-11.5, -1.75, 24), x_dir=(0.7071067811865475, -0.7071067811865475, 0), z_dir=(0, 0, 1)) * Sphere(VERRUNDUNG6_R, mode=Mode.PRIVATE)
    add(verrundung6_piece_4, mode=Mode.SUBTRACT)
    with BuildSketch(Plane(origin=(-1.75, -9, 1), x_dir=(0, 0, -1), z_dir=(0, -1, 0))) as verrundung6_piece_5_section:
        Polygon((0, 0), (VERRUNDUNG6_R, 0), (VERRUNDUNG6_R, VERRUNDUNG6_R), (0, VERRUNDUNG6_R), align=None)
    verrundung6_piece_5 = extrude(amount=VERRUNDUNG6_R, mode=Mode.PRIVATE)
    verrundung6_piece_5 = verrundung6_piece_5 - Plane(origin=(-1.75, -9, 1), x_dir=(-0.7071067811865475, 0, 0.7071067811865475), z_dir=(0, -1, 0)) * Sphere(VERRUNDUNG6_R, mode=Mode.PRIVATE)
    add(verrundung6_piece_5, mode=Mode.SUBTRACT)
    with BuildSketch(Plane(origin=(-1.75, 9, 1), x_dir=(0, 1, 0), z_dir=(0, 0, -1))) as verrundung6_piece_6_section:
        Polygon((0, 0), (VERRUNDUNG6_R, 0), (VERRUNDUNG6_R, VERRUNDUNG6_R), (0, VERRUNDUNG6_R), align=None)
    verrundung6_piece_6 = extrude(amount=VERRUNDUNG6_R, mode=Mode.PRIVATE)
    verrundung6_piece_6 = verrundung6_piece_6 - Plane(origin=(-1.75, 9, 1), x_dir=(-0.7071067811865475, -0.7071067811865475, 0), z_dir=(0, 0, -1)) * Sphere(VERRUNDUNG6_R, mode=Mode.PRIVATE)
    add(verrundung6_piece_6, mode=Mode.SUBTRACT)
    with BuildSketch(Plane(origin=(1.75, -9, 1), x_dir=(0, 0, -1), z_dir=(0, -1, 0))) as verrundung6_piece_7_section:
        Polygon((0, 0), (VERRUNDUNG6_R, 0), (VERRUNDUNG6_R, -VERRUNDUNG6_R), (0, -VERRUNDUNG6_R), align=None)
    verrundung6_piece_7 = extrude(amount=VERRUNDUNG6_R, mode=Mode.PRIVATE)
    verrundung6_piece_7 = verrundung6_piece_7 - Plane(origin=(1.75, -9, 1), x_dir=(0.7071067811865475, 0, 0.7071067811865475), z_dir=(0, -1, 0)) * Sphere(VERRUNDUNG6_R, mode=Mode.PRIVATE)
    add(verrundung6_piece_7, mode=Mode.SUBTRACT)
    with BuildSketch(Plane(origin=(1.75, 9, 1), x_dir=(0, 1, 0), z_dir=(0, 0, -1))) as verrundung6_piece_8_section:
        Polygon((0, 0), (VERRUNDUNG6_R, 0), (VERRUNDUNG6_R, -VERRUNDUNG6_R), (0, -VERRUNDUNG6_R), align=None)
    verrundung6_piece_8 = extrude(amount=VERRUNDUNG6_R, mode=Mode.PRIVATE)
    verrundung6_piece_8 = verrundung6_piece_8 - Plane(origin=(1.75, 9, 1), x_dir=(0.7071067811865475, -0.7071067811865475, 0), z_dir=(0, 0, -1)) * Sphere(VERRUNDUNG6_R, mode=Mode.PRIVATE)
    add(verrundung6_piece_8, mode=Mode.SUBTRACT)
    with BuildSketch(Plane(origin=(-11.5, -9, 24), x_dir=(0, 0, 1), z_dir=(0, -1, 0))) as verrundung6_piece_9_section:
        Polygon((0, 0), (VERRUNDUNG6_R, 0), (VERRUNDUNG6_R, VERRUNDUNG6_R), (0, VERRUNDUNG6_R), align=None)
    verrundung6_piece_9 = extrude(amount=VERRUNDUNG6_R, mode=Mode.PRIVATE)
    verrundung6_piece_9 = verrundung6_piece_9 - Plane(origin=(-11.5, -9, 24), x_dir=(0.7071067811865475, 0, -0.7071067811865475), z_dir=(0, -1, 0)) * Sphere(VERRUNDUNG6_R, mode=Mode.PRIVATE)
    add(verrundung6_piece_9, mode=Mode.SUBTRACT)
    with BuildSketch(Plane(origin=(-11.5, -10, 25), x_dir=(0, 0, -1), z_dir=(1, 0, 0)), Plane(origin=(-12.5, -10, -2.5), x_dir=(1, 0, 0), z_dir=(0, 0, 1))) as verrundung6_piece_10:
        with BuildLine():
            CenterArc((VERRUNDUNG6_R, VERRUNDUNG6_R), VERRUNDUNG6_R, 180, 90)
            Line((0, VERRUNDUNG6_R), (0, 0))
            Line((0, 0), (VERRUNDUNG6_R, 0))
        make_face()
    extrude(amount=26.5, mode=Mode.SUBTRACT)
    with BuildSketch(Plane(origin=(12.5, -12.5, 25), x_dir=(0, 0, -1), z_dir=(0, 1, 0)), Plane(origin=(12.5, 1.75, 25), x_dir=(0, 0, -1), z_dir=(0, 1, 0)), Plane(origin=(-12.5, 12.5, 25), x_dir=(0, 0, -1), z_dir=(0, -1, 0))) as verrundung6_piece_11:
        with BuildLine():
            CenterArc((VERRUNDUNG6_R, VERRUNDUNG6_R), VERRUNDUNG6_R, 180, 90)
            Line((0, VERRUNDUNG6_R), (0, 0))
            Line((0, 0), (VERRUNDUNG6_R, 0))
        make_face()
    extrude(amount=10.75, mode=Mode.SUBTRACT)
    with BuildSketch(Plane(origin=(-12.5, -1.75, 25), x_dir=(1, 0, 0), z_dir=(0, -1, 0))) as verrundung6_piece_12:
        with BuildLine():
            CenterArc((VERRUNDUNG6_R, -VERRUNDUNG6_R), VERRUNDUNG6_R, 90, 90)
            Line((0, -VERRUNDUNG6_R), (0, 0))
            Line((0, 0), (VERRUNDUNG6_R, 0))
        make_face()
    extrude(amount=7.25, mode=Mode.SUBTRACT)
    with BuildSketch(Plane(origin=(-1.75, 10, 0), x_dir=(0, -1, 0), z_dir=(-1, 0, 0)), Plane(origin=(15, 10, 0), x_dir=(0, -1, 0), z_dir=(-1, 0, 0))) as verrundung6_piece_13:
        with BuildLine():
            CenterArc((VERRUNDUNG6_R, VERRUNDUNG6_R), VERRUNDUNG6_R, 180, 90)
            Line((0, VERRUNDUNG6_R), (0, 0))
            Line((0, 0), (VERRUNDUNG6_R, 0))
        make_face()
    extrude(amount=13.25, mode=Mode.SUBTRACT)
    with BuildSketch(Plane(origin=(1.75, -10, 0), x_dir=(0, 0, 1), z_dir=(1, 0, 0)), Plane(origin=(-15, -10, 0), x_dir=(0, 0, 1), z_dir=(1, 0, 0))) as verrundung6_piece_14:
        with BuildLine():
            CenterArc((VERRUNDUNG6_R, -VERRUNDUNG6_R), VERRUNDUNG6_R, 90, 90)
            Line((0, -VERRUNDUNG6_R), (0, 0))
            Line((0, 0), (VERRUNDUNG6_R, 0))
        make_face()
    extrude(amount=13.25, mode=Mode.SUBTRACT)
    with BuildSketch(Plane(origin=(15, 10, 25), x_dir=(0, 0, -1), z_dir=(-1, 0, 0))) as verrundung6_piece_15:
        with BuildLine():
            CenterArc((VERRUNDUNG6_R, VERRUNDUNG6_R), VERRUNDUNG6_R, 180, 90)
            Line((0, VERRUNDUNG6_R), (0, 0))
            Line((0, 0), (VERRUNDUNG6_R, 0))
        make_face()
    extrude(amount=30, mode=Mode.SUBTRACT)
    with BuildSketch(Plane(origin=(12.5, -12.5, 0), x_dir=(-1, 0, 0), z_dir=(0, 1, 0))) as verrundung6_piece_16:
        with BuildLine():
            CenterArc((VERRUNDUNG6_R, VERRUNDUNG6_R), VERRUNDUNG6_R, 180, 90)
            Line((0, VERRUNDUNG6_R), (0, 0))
            Line((0, 0), (VERRUNDUNG6_R, 0))
        make_face()
    extrude(amount=25, mode=Mode.SUBTRACT)


solid = part.part
